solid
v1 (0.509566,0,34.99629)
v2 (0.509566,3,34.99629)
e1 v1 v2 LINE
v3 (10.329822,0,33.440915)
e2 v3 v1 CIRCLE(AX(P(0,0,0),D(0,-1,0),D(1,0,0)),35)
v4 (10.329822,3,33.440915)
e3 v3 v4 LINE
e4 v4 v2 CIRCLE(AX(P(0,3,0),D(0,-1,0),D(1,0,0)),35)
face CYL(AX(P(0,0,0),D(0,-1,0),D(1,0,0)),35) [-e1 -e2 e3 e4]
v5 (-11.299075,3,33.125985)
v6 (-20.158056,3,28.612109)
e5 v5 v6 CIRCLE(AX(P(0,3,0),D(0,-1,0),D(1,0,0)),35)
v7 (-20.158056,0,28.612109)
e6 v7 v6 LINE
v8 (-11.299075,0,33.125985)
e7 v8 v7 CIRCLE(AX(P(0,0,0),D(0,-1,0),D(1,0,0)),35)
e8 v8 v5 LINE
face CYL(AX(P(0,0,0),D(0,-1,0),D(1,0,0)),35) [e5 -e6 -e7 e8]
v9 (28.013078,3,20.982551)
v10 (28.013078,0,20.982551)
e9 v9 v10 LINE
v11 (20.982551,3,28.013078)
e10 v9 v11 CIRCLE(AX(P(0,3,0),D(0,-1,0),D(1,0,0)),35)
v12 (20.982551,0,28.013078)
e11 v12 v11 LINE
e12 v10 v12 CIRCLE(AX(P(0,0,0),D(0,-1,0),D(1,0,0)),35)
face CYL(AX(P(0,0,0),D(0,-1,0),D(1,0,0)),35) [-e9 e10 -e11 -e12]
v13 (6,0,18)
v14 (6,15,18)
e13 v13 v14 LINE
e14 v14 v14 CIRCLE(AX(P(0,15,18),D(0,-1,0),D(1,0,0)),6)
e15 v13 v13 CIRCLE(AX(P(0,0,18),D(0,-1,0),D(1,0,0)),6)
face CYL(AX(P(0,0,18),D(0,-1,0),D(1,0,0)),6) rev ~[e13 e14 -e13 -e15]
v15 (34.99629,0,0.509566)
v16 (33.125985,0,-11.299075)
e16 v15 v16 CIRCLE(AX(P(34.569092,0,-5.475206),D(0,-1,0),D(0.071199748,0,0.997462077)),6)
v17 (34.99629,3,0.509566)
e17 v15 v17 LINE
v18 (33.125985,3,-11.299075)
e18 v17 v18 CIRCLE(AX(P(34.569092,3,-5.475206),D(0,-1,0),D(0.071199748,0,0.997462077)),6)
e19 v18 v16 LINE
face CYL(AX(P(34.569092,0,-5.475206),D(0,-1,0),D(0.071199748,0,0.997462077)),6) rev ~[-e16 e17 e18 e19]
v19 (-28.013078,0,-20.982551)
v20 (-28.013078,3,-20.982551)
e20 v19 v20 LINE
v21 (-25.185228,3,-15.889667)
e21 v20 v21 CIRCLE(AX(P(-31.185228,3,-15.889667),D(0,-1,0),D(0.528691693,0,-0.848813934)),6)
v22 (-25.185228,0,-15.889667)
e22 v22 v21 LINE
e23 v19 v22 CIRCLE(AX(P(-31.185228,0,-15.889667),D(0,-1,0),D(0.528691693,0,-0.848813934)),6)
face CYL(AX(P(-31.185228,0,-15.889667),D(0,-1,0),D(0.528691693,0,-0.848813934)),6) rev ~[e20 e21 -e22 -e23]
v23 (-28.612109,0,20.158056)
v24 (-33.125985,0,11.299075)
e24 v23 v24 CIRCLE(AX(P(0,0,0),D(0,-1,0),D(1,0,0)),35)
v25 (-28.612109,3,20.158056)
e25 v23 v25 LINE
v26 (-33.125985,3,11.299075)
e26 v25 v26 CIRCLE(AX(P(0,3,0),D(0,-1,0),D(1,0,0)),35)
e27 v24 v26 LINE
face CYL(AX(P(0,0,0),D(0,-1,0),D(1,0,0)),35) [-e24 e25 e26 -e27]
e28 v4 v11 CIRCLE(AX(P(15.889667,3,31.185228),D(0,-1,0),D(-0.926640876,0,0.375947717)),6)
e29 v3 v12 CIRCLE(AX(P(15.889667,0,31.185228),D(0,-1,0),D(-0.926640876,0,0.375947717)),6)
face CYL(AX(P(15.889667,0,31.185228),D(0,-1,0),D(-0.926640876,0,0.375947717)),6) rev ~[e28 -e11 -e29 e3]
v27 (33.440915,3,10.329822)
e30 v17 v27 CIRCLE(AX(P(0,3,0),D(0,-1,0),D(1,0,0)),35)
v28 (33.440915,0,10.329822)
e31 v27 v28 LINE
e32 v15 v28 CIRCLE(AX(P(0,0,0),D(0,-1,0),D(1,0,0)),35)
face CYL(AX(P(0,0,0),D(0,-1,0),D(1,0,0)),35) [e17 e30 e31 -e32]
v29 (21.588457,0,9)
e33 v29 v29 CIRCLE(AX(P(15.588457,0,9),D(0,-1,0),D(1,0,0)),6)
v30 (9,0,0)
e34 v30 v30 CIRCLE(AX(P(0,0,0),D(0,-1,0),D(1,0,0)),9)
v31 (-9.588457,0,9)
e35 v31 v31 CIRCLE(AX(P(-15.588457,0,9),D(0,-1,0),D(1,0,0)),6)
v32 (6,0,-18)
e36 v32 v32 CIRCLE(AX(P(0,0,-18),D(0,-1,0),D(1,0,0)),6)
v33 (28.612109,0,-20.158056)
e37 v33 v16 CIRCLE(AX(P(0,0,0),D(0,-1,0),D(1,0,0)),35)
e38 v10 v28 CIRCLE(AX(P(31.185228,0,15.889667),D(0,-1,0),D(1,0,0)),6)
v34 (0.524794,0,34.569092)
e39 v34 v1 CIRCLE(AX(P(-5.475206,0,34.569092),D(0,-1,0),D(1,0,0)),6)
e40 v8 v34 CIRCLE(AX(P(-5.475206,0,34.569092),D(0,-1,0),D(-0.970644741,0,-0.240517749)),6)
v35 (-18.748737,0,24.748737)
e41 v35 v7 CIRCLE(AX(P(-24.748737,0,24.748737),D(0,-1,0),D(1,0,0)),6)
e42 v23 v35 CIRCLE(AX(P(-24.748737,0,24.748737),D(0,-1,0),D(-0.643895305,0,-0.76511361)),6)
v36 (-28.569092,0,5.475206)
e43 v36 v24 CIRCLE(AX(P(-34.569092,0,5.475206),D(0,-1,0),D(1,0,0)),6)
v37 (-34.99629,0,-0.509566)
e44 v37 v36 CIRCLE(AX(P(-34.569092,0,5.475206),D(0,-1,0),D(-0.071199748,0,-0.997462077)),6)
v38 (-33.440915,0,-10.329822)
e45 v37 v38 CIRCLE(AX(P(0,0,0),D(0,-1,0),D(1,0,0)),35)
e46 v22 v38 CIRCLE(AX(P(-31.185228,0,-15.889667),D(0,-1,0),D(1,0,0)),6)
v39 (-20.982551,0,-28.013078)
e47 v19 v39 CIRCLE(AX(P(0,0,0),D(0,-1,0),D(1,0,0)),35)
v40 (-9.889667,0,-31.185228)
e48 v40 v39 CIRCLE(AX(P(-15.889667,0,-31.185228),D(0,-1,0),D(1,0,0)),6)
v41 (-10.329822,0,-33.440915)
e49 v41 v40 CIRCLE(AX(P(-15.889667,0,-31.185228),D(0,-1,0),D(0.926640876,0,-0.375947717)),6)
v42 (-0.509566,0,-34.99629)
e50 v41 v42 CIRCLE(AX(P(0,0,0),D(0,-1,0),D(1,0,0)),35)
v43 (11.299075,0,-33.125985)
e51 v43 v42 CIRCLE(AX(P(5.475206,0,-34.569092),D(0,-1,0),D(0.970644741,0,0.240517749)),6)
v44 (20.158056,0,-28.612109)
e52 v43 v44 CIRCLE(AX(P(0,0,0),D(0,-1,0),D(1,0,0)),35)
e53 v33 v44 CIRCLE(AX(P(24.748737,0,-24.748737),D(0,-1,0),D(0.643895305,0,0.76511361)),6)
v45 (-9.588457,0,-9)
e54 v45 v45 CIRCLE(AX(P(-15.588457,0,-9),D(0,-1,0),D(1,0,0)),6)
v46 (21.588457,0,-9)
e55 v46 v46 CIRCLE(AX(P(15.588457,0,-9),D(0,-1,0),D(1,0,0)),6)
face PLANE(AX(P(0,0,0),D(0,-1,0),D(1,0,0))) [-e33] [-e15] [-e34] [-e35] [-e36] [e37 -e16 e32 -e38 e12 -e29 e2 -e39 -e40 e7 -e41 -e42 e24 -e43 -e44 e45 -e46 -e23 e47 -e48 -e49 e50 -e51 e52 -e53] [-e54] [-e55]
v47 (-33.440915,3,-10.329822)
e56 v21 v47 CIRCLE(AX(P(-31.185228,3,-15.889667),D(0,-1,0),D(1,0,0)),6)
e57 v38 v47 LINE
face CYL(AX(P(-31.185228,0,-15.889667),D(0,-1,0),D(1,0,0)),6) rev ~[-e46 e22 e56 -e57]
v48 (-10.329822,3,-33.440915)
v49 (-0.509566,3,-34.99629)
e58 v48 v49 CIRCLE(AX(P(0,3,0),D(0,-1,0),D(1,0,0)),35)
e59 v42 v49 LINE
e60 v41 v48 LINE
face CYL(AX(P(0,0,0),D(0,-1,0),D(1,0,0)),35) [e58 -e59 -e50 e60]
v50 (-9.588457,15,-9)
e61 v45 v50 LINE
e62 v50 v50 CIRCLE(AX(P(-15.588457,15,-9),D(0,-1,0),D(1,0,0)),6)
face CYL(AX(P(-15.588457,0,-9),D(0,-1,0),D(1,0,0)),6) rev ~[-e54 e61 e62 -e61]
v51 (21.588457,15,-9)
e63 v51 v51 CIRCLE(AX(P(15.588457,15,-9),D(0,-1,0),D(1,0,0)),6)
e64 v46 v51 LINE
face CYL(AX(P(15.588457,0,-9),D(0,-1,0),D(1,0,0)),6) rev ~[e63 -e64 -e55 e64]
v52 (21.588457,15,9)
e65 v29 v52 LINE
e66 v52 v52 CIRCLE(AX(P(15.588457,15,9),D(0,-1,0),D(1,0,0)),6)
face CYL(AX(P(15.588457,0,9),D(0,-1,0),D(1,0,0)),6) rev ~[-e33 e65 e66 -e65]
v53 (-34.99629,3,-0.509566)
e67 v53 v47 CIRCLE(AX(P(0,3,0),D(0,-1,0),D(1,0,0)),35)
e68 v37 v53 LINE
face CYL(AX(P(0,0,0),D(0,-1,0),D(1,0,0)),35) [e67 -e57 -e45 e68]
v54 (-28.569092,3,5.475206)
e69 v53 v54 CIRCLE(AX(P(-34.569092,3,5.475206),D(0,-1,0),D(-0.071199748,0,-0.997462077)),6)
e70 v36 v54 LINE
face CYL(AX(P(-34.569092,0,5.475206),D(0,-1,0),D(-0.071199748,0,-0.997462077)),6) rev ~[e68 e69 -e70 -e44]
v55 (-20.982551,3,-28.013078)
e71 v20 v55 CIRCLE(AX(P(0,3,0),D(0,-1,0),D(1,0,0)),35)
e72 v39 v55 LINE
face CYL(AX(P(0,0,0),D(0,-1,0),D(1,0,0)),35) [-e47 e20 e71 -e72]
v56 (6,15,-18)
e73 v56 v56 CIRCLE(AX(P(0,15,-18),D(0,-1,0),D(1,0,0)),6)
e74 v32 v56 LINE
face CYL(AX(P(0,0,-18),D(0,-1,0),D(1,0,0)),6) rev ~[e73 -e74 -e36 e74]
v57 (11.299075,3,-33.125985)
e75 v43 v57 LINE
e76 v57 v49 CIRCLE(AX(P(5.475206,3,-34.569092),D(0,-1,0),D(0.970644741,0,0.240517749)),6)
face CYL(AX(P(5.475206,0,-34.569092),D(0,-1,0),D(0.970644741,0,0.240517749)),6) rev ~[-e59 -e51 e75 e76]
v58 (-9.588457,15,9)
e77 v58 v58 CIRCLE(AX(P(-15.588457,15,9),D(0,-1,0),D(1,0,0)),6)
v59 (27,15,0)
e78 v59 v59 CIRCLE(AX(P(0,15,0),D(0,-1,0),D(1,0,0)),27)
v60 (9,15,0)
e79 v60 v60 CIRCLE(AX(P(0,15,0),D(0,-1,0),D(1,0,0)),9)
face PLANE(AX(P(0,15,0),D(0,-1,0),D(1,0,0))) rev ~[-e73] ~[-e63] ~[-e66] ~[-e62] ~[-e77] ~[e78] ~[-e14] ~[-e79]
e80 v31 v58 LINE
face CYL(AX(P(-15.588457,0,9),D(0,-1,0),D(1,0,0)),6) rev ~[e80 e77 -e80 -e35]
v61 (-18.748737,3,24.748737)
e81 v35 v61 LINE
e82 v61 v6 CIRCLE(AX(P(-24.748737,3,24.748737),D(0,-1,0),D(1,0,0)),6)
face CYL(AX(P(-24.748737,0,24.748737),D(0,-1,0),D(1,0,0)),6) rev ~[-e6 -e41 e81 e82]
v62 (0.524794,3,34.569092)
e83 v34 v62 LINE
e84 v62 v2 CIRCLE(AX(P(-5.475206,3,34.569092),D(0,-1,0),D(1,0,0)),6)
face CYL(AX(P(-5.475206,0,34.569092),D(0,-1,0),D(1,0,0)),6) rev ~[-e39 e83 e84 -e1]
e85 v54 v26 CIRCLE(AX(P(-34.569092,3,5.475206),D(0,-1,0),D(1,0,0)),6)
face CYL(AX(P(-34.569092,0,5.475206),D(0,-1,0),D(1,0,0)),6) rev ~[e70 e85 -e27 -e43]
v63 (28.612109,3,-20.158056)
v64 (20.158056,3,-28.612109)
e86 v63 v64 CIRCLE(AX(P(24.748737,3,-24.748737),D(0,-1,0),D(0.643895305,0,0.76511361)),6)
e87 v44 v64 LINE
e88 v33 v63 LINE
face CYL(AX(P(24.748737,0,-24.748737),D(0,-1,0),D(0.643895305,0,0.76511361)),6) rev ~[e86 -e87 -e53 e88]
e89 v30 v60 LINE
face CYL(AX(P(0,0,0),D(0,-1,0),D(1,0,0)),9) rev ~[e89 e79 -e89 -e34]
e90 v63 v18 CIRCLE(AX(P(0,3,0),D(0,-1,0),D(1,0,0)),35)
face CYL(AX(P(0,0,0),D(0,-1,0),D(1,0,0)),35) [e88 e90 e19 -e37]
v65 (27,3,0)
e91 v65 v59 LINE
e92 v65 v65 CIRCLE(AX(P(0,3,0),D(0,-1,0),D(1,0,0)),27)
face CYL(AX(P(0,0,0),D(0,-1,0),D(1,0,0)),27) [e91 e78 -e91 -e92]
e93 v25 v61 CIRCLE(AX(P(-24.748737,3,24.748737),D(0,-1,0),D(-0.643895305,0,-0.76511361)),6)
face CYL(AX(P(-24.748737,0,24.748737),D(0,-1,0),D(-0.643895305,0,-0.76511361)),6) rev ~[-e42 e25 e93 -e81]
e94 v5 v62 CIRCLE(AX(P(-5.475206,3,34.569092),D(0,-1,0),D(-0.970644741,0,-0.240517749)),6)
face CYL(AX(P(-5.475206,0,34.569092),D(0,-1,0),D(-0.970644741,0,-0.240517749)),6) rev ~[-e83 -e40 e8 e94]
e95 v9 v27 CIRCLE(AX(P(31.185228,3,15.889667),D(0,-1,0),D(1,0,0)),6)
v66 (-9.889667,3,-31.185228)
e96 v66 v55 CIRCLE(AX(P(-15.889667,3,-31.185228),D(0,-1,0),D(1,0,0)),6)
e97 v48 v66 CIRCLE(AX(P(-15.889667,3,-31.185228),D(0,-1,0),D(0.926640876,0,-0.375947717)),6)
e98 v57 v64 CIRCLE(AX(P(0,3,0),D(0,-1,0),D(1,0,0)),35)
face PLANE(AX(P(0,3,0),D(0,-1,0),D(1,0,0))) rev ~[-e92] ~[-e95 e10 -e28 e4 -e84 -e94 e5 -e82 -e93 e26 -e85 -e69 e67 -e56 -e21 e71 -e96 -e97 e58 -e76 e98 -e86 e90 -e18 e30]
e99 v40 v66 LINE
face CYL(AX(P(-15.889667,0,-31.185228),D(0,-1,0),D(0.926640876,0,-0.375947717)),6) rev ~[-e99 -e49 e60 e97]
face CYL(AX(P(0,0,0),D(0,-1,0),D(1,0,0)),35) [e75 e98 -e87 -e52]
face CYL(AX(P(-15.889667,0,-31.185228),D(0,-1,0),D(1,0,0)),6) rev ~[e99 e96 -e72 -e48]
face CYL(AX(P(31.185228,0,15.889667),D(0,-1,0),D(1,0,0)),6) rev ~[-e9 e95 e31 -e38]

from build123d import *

# Parameters (mm, degrees)
F0_R     = 27
F1_DEPTH = 15
F2_R     = 35
F2_R_2   = 27
F3_DEPTH = 3
F4_R     = 9
F5_DEPTH = 15.001
F6_R     = 6
F7_DEPTH = 15.001


with BuildPart() as f1:
    # F0 (on Front) → F1 (new body)
    with BuildSketch(Plane.XZ):
        Circle(F0_R)
    extrude(amount=-F1_DEPTH)

    # F2 (on face) → F3 (join)
    with BuildSketch(Plane.XZ):
        Circle(F2_R)
        Circle(F2_R_2, mode=Mode.SUBTRACT)
    extrude(amount=-F3_DEPTH)

    # F4 (on face) → F5 (cut, through all)
    with BuildSketch(Plane.XZ):
        Circle(F4_R)
    extrude(amount=-F5_DEPTH, mode=Mode.SUBTRACT)

    # F6 (on face) → F7 (cut, through all)
    with BuildSketch(Plane.XZ):
        with Locations((0, 18)):
            Circle(F6_R)
        with Locations((-15.5884572681, 9)):
            Circle(F6_R)
        with Locations((-15.5884572681, -9)):
            Circle(F6_R)
        with Locations((0, -18)):
            Circle(F6_R)
        with BuildLine():
            ThreePointArc((-28.6121091704, 20.1580556806), (-22.2169623686, 19.3090576187), (-18.7487373415, 24.7487373415))
            ThreePointArc((-18.7487373415, 24.7487373415), (-19.1120676703, 26.8049365092), (-20.1580556806, 28.6121091704))
            ThreePointArc((-20.1580556806, 28.6121091704), (-24.7487373415, 24.7487373415), (-28.6121091704, 20.1580556806))
        make_face()
        with BuildLine():
            ThreePointArc((0.5095661882, 34.9962904077), (-5.4752062764, 34.5690919208), (-11.2990747198, 33.1259854265))
            ThreePointArc((-11.2990747198, 33.1259854265), (-4.7482986689, 28.6132875813), (0.5247937236, 34.5690919208))
            ThreePointArc((0.5247937236, 34.5690919208), (0.5209856313, 34.782826818), (0.5095661882, 34.9962904077))
        make_face()
        with BuildLine():
            ThreePointArc((-34.9962904077, -0.5095661882), (-34.5690919208, 5.4752062764), (-33.1259854265, 11.2990747198))
            ThreePointArc((-33.1259854265, 11.2990747198), (-40.4952219644, 6.4138130666), (-34.9962904077, -0.5095661882))
        make_face()
        with BuildLine():
            ThreePointArc((-28.5690919208, 5.4752062764), (-29.8437009864, 9.1725946137), (-33.1259854265, 11.2990747198))
            ThreePointArc((-33.1259854265, 11.2990747198), (-34.5690919208, 5.4752062764), (-34.9962904077, -0.5095661882))
            ThreePointArc((-34.9962904077, -0.5095661882), (-30.4802773568, 1.084124922), (-28.5690919208, 5.4752062764))
        make_face()
        with BuildLine():
            ThreePointArc((20.9825510926, 28.0130781894), (15.8896674909, 31.1852283466), (10.3298222323, 33.4409146503))
            ThreePointArc((10.3298222323, 33.4409146503), (13.1657244924, 25.8391892015), (20.9825510926, 28.0130781894))
        make_face()
        with BuildLine():
            ThreePointArc((-25.1852283466, -15.8896674909), (-27.8336703374, -10.9130161156), (-33.4409146503, -10.3298222323))
            ThreePointArc((-33.4409146503, -10.3298222323), (-31.1852283466, -15.8896674909), (-28.0130781894, -20.9825510926))
            ThreePointArc((-28.0130781894, -20.9825510926), (-25.9396158493, -18.8023208394), (-25.1852283466, -15.8896674909))
        make_face()
        with BuildLine():
            ThreePointArc((33.4409146503, 10.3298222323), (31.1852283466, 15.8896674909), (28.0130781894, 20.9825510926))
            ThreePointArc((28.0130781894, 20.9825510926), (25.8391892015, 13.1657244924), (33.4409146503, 10.3298222323))
        make_face()
        with BuildLine():
            ThreePointArc((37.1852283466, 15.8896674909), (34.0978816951, 21.1352799882), (28.0130781894, 20.9825510926))
            ThreePointArc((28.0130781894, 20.9825510926), (31.1852283466, 15.8896674909), (33.4409146503, 10.3298222323))
            ThreePointArc((33.4409146503, 10.3298222323), (36.1618797219, 12.5381094817), (37.1852283466, 15.8896674909))
        make_face()
        with BuildLine():
            ThreePointArc((-9.8896674909, -31.1852283466), (-14.2400162566, -25.4164632443), (-20.9825510926, -28.0130781894))
            ThreePointArc((-20.9825510926, -28.0130781894), (-15.8896674909, -31.1852283466), (-10.3298222323, -33.4409146503))
            ThreePointArc((-10.3298222323, -33.4409146503), (-10.00073416, -32.3343428858), (-9.8896674909, -31.1852283466))
        make_face()
        with BuildLine():
            ThreePointArc((35, 0), (34.9990725896, 0.2547898454), (34.9962904077, 0.5095661882))
            ThreePointArc((34.9962904077, 0.5095661882), (28.6429618773, -4.5365994862), (33.1259854265, -11.2990747198))
            ThreePointArc((33.1259854265, -11.2990747198), (34.5283180153, -5.726714157), (35, 0))
        make_face()
        with BuildLine():
            ThreePointArc((40.5690919208, -5.4752062764), (38.9601732752, -1.3863917123), (34.9962904077, 0.5095661882))
            ThreePointArc((34.9962904077, 0.5095661882), (34.9990725896, 0.2547898454), (35, 0))
            ThreePointArc((35, 0), (34.5283180153, -5.726714157), (33.1259854265, -11.2990747198))
            ThreePointArc((33.1259854265, -11.2990747198), (38.2664802582, -10.2005972108), (40.5690919208, -5.4752062764))
        make_face()
        with BuildLine():
            ThreePointArc((11.2990747198, -33.1259854265), (4.5365994862, -28.6429618773), (-0.5095661882, -34.9962904077))
            ThreePointArc((-0.5095661882, -34.9962904077), (5.4752062764, -34.5690919208), (11.2990747198, -33.1259854265))
        make_face()
        with BuildLine():
            ThreePointArc((20.1580556806, -28.6121091704), (24.7487373415, -24.7487373415), (28.6121091704, -20.1580556806))
            ThreePointArc((28.6121091704, -20.1580556806), (20.5060966544, -20.5060966544), (20.1580556806, -28.6121091704))
        make_face()
        with Locations((15.5884572681, -9)):
            Circle(F6_R)
        with Locations((15.5884572681, 9)):
            Circle(F6_R)
    extrude(amount=-F7_DEPTH, mode=Mode.SUBTRACT)


solid = f1.part
